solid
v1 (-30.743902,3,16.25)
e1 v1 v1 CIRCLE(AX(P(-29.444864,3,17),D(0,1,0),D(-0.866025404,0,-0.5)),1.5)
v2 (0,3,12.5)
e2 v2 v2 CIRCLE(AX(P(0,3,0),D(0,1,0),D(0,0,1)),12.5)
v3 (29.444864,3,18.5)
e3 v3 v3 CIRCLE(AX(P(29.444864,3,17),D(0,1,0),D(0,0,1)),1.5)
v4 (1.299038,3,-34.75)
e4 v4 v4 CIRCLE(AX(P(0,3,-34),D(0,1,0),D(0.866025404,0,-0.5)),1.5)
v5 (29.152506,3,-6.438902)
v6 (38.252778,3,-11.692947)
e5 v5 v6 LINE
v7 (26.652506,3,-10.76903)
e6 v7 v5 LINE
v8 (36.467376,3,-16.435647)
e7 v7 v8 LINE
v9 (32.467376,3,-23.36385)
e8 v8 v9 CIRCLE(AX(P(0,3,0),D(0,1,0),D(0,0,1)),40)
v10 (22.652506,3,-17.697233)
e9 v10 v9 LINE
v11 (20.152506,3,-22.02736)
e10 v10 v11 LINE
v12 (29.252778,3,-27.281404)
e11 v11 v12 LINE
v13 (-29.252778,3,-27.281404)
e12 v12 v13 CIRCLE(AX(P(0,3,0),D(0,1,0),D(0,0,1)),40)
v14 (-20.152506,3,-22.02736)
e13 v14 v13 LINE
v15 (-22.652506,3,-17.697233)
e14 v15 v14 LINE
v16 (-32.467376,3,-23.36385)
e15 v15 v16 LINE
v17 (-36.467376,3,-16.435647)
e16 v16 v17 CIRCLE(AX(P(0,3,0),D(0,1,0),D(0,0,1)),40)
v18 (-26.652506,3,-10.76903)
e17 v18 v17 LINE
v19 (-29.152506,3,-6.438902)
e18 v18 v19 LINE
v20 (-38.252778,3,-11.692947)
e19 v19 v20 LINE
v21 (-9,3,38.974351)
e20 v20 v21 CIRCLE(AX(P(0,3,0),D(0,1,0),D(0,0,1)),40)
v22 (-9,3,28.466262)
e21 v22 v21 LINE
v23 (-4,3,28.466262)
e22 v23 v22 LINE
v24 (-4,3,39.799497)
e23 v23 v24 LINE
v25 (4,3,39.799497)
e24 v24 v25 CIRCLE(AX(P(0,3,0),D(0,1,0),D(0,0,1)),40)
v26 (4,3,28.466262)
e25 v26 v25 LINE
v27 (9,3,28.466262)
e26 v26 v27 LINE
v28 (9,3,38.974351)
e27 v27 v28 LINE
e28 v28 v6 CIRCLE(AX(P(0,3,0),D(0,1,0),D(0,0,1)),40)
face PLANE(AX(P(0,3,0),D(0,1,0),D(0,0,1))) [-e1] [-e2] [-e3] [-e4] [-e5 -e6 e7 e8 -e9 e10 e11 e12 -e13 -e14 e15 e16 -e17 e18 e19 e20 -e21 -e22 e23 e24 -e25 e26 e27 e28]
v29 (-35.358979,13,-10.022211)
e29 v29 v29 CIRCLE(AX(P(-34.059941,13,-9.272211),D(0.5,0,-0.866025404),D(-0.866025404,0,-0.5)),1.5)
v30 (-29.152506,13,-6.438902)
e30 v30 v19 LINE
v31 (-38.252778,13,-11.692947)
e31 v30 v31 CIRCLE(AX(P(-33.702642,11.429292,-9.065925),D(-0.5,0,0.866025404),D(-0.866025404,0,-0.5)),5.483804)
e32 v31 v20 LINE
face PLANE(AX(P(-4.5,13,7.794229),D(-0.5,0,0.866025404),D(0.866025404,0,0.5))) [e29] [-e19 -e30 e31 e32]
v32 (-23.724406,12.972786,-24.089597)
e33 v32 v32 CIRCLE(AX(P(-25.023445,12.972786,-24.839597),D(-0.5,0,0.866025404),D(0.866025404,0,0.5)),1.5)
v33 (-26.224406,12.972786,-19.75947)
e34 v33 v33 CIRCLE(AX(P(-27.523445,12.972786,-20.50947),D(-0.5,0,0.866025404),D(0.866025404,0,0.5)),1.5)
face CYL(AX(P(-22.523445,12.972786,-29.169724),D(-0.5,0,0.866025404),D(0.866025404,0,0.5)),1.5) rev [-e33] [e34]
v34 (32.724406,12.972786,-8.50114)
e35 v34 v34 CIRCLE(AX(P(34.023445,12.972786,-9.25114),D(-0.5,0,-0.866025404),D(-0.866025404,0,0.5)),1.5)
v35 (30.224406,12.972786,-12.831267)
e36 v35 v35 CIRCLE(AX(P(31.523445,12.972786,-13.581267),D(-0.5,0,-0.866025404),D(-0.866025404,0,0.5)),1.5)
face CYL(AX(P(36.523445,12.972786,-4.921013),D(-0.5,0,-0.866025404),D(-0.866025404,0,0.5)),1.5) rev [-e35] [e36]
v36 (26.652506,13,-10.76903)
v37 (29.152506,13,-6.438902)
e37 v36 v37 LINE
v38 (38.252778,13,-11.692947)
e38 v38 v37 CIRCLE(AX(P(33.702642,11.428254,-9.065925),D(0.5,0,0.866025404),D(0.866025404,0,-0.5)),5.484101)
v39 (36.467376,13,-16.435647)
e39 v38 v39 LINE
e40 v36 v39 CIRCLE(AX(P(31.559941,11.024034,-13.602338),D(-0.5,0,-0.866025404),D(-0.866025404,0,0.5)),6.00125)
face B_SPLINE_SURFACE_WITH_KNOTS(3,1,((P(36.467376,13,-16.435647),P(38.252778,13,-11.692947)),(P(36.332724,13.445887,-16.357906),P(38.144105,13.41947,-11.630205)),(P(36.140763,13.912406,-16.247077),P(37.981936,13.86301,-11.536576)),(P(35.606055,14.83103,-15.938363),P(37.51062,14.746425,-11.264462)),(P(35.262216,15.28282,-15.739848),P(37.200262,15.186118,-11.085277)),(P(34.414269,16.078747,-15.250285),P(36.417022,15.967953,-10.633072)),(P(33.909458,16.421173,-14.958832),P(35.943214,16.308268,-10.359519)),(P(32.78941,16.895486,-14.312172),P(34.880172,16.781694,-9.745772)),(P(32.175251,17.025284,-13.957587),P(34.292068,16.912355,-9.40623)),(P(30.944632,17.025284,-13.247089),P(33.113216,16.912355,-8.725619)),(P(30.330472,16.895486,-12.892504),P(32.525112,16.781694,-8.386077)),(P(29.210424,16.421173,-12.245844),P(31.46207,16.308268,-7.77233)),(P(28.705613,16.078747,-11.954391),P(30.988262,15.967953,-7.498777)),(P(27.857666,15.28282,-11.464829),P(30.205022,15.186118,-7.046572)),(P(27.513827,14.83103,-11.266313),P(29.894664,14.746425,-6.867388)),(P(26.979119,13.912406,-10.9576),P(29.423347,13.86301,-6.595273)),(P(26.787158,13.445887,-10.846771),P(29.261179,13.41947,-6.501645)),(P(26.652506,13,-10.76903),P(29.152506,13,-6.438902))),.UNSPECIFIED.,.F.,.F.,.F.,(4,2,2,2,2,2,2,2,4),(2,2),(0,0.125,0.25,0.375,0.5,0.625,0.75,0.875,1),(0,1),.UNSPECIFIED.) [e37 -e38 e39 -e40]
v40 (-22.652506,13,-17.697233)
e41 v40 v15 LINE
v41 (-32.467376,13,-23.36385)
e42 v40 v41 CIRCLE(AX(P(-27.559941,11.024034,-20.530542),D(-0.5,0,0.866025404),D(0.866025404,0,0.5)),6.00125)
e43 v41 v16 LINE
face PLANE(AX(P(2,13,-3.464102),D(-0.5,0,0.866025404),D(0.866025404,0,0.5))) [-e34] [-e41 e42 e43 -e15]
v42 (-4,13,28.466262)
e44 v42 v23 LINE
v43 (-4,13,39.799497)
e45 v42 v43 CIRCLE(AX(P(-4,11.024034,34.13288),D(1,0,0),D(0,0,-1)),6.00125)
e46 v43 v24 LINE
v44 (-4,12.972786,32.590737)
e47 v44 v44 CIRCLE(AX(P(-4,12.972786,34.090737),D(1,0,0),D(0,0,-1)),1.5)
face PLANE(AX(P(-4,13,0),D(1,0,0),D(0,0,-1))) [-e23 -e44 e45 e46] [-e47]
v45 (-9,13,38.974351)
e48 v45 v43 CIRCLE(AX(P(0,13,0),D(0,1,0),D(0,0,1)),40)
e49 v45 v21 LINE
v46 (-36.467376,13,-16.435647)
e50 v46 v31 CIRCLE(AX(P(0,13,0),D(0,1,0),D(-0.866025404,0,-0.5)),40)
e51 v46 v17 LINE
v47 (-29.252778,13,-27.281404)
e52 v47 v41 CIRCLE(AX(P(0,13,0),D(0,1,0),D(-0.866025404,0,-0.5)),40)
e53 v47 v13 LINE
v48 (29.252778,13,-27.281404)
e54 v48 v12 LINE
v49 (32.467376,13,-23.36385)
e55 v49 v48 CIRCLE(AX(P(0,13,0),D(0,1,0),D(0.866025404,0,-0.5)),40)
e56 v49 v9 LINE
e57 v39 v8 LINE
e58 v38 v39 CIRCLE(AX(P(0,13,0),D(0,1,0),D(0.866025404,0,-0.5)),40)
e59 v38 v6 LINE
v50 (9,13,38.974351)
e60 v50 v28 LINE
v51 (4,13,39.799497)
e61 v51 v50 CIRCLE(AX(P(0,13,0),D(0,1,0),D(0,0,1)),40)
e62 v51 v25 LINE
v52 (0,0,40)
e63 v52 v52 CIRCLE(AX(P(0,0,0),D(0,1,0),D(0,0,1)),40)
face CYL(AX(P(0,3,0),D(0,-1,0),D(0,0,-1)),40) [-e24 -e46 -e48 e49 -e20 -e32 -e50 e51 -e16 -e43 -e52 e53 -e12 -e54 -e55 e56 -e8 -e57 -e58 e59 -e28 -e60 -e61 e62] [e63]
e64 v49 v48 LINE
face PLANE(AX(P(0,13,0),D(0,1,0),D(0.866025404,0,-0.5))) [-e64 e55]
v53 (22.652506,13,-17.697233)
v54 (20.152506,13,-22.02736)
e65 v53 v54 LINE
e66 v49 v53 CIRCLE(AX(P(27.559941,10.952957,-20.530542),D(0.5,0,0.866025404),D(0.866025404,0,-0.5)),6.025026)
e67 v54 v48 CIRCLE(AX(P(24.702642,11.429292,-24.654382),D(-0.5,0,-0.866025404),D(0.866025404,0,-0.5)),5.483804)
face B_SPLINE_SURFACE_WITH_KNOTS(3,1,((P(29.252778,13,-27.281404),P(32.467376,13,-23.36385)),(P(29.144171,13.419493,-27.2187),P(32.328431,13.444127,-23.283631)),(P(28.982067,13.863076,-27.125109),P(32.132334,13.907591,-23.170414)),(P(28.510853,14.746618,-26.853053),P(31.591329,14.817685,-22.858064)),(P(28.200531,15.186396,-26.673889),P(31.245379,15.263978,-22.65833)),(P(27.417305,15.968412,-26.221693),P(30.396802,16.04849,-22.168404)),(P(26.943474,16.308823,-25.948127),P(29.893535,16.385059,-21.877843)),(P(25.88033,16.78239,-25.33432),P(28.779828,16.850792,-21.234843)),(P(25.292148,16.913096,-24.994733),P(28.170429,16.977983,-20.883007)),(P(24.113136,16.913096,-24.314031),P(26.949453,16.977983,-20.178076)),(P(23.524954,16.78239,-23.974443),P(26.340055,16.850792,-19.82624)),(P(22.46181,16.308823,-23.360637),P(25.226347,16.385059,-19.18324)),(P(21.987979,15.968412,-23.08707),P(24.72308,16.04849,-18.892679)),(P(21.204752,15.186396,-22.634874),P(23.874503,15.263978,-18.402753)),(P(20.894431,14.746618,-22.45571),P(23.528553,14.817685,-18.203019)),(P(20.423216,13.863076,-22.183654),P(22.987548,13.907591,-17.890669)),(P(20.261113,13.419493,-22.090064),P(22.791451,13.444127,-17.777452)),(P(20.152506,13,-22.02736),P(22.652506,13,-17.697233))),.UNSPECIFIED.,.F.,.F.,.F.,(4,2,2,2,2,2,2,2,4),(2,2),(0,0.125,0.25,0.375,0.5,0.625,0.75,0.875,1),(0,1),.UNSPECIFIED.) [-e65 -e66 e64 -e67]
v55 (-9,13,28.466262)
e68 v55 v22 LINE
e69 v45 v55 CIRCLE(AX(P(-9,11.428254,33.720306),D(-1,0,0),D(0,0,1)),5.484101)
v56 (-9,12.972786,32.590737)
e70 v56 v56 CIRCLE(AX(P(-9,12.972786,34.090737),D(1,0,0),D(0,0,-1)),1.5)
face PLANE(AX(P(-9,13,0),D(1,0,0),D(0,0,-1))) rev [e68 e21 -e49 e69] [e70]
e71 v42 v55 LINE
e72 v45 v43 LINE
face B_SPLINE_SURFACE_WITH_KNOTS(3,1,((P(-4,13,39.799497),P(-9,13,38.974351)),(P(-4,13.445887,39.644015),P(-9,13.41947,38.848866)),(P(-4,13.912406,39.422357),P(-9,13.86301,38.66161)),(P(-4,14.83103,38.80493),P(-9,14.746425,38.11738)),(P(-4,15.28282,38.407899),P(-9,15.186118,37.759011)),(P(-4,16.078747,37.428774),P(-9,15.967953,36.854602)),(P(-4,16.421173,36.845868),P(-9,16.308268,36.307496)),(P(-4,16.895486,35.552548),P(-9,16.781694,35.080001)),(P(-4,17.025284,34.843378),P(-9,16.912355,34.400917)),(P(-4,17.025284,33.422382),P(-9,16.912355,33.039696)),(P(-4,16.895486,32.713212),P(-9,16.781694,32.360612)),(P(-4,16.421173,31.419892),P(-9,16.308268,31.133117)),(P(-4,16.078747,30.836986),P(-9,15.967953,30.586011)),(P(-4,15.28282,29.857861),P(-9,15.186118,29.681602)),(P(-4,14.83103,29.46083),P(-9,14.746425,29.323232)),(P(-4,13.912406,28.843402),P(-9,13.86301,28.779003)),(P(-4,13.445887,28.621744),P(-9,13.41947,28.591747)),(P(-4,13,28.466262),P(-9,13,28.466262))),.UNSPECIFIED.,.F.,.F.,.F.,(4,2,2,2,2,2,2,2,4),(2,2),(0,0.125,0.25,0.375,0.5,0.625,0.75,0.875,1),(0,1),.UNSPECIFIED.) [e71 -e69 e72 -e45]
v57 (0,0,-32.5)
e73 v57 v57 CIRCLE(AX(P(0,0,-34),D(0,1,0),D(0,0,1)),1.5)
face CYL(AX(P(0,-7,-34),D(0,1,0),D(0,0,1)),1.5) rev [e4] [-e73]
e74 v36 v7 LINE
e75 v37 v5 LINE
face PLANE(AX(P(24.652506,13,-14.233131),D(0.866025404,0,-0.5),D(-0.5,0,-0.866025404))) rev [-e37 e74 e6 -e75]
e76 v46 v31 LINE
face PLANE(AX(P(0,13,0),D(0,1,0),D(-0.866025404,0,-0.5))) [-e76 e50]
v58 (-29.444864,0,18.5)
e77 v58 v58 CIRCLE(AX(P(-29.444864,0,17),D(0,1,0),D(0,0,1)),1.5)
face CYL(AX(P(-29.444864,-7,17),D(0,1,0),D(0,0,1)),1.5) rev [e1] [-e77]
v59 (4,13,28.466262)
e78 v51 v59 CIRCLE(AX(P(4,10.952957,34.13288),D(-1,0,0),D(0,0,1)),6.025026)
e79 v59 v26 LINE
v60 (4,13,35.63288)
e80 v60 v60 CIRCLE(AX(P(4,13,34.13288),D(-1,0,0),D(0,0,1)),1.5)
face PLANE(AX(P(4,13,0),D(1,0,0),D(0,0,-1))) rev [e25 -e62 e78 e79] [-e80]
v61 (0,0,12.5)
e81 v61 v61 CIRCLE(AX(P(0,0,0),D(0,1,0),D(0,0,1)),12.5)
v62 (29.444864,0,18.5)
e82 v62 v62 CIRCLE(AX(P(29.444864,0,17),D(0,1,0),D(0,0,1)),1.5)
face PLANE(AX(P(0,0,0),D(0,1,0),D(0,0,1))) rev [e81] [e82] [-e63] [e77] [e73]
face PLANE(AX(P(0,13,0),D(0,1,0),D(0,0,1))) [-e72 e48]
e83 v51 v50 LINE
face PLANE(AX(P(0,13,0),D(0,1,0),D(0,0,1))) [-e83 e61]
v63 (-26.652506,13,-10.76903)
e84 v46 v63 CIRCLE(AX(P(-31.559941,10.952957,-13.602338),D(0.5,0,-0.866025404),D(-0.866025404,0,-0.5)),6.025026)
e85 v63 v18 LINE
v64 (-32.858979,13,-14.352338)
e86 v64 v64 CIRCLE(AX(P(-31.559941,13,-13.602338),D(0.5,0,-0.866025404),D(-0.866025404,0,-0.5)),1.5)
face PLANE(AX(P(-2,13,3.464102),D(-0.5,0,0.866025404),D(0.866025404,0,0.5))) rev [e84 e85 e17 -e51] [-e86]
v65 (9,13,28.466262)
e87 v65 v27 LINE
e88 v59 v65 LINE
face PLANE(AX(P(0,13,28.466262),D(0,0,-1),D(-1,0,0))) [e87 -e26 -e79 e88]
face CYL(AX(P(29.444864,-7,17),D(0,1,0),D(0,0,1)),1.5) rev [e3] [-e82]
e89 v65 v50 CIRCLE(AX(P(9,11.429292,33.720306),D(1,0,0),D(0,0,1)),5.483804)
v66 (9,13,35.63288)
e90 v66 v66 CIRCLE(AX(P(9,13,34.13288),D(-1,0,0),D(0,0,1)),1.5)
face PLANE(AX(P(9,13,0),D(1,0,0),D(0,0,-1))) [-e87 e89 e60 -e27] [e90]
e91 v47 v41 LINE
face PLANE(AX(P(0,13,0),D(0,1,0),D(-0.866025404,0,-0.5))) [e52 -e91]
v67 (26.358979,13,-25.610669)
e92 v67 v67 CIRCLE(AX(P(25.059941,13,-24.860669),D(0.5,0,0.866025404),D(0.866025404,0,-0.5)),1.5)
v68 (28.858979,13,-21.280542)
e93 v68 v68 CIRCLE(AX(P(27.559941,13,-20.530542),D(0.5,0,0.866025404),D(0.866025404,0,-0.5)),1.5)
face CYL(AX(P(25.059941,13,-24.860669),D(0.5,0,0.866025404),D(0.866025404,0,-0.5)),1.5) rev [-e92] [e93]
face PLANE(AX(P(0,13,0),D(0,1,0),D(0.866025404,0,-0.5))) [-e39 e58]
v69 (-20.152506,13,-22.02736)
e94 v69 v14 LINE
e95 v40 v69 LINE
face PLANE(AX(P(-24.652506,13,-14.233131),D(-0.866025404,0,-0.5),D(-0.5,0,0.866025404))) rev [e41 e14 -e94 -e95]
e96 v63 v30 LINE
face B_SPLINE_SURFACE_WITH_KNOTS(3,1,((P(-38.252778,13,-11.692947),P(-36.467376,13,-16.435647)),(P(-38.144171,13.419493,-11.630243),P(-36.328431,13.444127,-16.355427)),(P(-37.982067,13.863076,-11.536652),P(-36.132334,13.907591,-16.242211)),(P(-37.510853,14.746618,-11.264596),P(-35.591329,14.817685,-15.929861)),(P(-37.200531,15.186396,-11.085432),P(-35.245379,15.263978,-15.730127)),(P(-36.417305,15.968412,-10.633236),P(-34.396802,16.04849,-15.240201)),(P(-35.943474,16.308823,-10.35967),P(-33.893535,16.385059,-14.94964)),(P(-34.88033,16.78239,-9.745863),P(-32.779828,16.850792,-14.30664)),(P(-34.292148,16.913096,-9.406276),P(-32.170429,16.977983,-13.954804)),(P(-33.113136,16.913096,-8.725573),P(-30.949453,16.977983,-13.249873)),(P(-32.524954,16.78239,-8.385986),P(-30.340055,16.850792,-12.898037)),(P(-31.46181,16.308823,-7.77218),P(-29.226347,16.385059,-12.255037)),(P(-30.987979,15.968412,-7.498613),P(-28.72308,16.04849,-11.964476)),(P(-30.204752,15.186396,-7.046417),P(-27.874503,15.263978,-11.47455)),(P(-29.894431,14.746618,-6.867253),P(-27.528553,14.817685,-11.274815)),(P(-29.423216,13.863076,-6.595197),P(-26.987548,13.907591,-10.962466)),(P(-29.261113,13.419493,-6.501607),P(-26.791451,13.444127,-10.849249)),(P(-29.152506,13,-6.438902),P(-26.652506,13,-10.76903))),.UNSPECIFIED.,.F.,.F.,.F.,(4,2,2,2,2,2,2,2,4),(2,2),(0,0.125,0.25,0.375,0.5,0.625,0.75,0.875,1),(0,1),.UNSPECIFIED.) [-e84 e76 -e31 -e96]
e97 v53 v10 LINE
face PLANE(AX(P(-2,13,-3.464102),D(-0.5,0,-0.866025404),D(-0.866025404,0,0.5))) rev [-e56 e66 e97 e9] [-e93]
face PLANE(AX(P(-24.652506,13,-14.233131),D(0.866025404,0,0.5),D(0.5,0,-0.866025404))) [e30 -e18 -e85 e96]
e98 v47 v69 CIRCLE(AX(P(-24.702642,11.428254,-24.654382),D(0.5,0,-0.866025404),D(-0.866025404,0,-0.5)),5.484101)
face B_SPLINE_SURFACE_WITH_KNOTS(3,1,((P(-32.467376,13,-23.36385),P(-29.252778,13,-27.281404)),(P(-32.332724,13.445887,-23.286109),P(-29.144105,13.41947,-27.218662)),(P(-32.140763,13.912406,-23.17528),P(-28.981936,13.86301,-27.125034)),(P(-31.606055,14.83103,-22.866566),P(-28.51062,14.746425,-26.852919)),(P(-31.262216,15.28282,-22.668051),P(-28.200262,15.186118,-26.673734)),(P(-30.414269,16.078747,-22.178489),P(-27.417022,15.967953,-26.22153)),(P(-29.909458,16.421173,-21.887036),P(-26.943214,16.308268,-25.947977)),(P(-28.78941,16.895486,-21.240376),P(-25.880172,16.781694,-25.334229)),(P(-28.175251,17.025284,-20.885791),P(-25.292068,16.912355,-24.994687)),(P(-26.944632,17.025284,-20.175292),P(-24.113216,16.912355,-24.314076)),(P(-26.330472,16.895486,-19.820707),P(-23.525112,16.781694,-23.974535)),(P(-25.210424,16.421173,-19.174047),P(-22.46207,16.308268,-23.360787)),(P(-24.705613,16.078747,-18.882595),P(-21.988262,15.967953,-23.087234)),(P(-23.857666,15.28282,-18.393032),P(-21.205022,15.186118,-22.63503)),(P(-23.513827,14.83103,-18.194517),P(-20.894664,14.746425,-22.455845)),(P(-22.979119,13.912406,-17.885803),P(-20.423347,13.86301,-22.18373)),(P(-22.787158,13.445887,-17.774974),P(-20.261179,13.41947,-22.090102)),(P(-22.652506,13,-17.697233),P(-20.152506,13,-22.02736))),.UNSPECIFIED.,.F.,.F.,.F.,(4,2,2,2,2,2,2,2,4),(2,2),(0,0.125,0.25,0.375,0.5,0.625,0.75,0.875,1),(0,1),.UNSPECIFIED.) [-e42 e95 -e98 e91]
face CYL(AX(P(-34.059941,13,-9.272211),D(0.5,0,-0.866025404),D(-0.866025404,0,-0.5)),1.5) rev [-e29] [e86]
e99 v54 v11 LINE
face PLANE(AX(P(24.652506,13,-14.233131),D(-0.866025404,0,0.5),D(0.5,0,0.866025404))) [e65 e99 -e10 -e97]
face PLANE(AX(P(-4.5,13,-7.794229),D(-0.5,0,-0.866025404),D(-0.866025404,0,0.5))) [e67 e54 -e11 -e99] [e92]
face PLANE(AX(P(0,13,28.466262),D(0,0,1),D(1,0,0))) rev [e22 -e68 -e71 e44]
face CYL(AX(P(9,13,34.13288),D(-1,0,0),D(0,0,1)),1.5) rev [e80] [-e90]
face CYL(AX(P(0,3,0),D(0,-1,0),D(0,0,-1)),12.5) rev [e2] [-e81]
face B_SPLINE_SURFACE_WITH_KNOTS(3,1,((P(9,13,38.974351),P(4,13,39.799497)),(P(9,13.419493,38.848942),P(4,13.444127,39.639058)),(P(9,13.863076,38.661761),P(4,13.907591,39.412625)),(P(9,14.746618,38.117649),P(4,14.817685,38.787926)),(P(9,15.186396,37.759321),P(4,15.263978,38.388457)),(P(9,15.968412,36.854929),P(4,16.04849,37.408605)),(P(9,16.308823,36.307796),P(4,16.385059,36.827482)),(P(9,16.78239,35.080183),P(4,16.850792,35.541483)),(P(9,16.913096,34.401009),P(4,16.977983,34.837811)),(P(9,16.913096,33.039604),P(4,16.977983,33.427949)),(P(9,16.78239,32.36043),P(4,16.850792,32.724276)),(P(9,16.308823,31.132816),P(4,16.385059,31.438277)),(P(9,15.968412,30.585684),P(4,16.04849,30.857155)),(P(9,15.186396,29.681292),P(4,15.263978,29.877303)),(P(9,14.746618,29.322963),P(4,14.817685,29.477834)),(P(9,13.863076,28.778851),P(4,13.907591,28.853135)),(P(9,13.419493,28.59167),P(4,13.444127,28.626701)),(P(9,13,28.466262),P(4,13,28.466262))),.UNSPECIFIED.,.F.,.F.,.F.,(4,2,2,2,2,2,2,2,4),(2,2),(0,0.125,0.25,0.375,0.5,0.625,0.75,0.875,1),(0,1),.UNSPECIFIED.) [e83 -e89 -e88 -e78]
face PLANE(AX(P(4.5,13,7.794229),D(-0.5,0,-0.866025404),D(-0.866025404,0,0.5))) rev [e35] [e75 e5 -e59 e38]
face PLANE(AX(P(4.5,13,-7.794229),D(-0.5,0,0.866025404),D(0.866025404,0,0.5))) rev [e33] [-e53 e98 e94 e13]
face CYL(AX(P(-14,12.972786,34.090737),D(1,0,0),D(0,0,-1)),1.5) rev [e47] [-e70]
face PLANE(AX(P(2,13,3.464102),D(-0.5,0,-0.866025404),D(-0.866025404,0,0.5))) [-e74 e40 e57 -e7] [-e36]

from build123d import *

# Parameters (mm, degrees)
SKETCH1_R           = 40
SKETCH1_R_2         = 12.5
BOSS_EXTRUDE1_DEPTH = 3
BOSS_EXTRUDE5_DEPTH = 10
SKETCH20_R          = 1.5
CUT_EXTRUDE3_DEPTH  = 5
SKETCH22_R          = 1.5
CUT_EXTRUDE4_DEPTH  = 10
CIRPATTERN1_COUNT   = 3
SKETCH24_R          = 1.5
CUT_EXTRUDE5_DEPTH  = 10
CIRPATTERN2_COUNT   = 3


with BuildPart() as part:
    # Sketch1 → Boss-Extrude1 (new body)
    with BuildSketch(Plane(origin=(0, 0, 0), x_dir=(1, 0, 0), z_dir=(0, 1, 0))):
        with Locations(Location((0, 0, 0), (0, 0, 270))):
            Circle(SKETCH1_R)
        with Locations(Location((0, 0, 0), (0, 0, 270))):
            Circle(SKETCH1_R_2, mode=Mode.SUBTRACT)
    extrude(amount=BOSS_EXTRUDE1_DEPTH)

    # Sketch8 → Boss-Extrude5 (add)
    with BuildSketch(Plane(origin=(0, 3, 0), x_dir=(1, 0, 0), z_dir=(0, 1, 0))):
        with BuildLine():
            Line((-4, -39.799497484), (-4, -28.466262232))
            Line((-4, -28.466262232), (-9, -28.466262232))
            Line((-9, -28.466262232), (-9, -38.97435054))
            ThreePointArc((-9, -38.97435054), (-6.513080444, -39.466185313), (-4, -39.799497484))
        make_face()
        with BuildLine():
            Line((4, -28.466262232), (4, -39.799497484))
            ThreePointArc((4, -39.799497484), (6.513080444, -39.466185313), (9, -38.97435054))
            Line((9, -38.97435054), (9, -28.466262232))
            Line((9, -28.466262232), (4, -28.466262232))
        make_face()
    boss_extrude5 = extrude(amount=BOSS_EXTRUDE5_DEPTH)

    # Sketch9 for Loft4 → Loft4 section 0
    with BuildSketch(Plane(origin=(9, 0, 0), x_dir=(0, 0, -1), z_dir=(1, 0, 0))):
        with BuildLine():
            Line((-28.466262232, 13), (-38.97435054, 13))
            # circular arc as an exact rational Bezier (weights 1, cos(half-angle), 1)
            Bezier((-38.97435054, 13), (-33.720306386, 30.574863042), (-28.466262232, 13), weights=[1, 0.286426753, 1])
        make_face()
    # Sketch10 for Loft4 → Loft4 section 1
    with BuildSketch(Plane.ZY.offset(-4)):
        with BuildLine():
            Line((28.466262232, 13), (39.799497484, 13))
            Bezier((39.799497484, 13), (34.132879858, 28.686313092), (28.466262232, 13), weights=[1, 0.339756679, 1])
        make_face()
    loft4 = loft()

    # Loft7: read off the stored shape, not the designer's step
    # Loft7: loft between two sections, ruled curve by curve
    loft7_from = [
        Edge.make_bspline([(-4, 13, 39.799497484), (-4, 13.445887075, 39.644015382), (-4, 13.912406496, 39.42235746), (-4, 14.83103025, 38.804929607), (-4, 15.282819738, 38.407898984), (-4, 16.078747391, 37.428773866), (-4, 16.421172618, 36.845868146), (-4, 16.895486355, 35.552548175), (-4, 17.025283738, 34.843378132), (-4, 17.025283738, 33.422381584), (-4, 16.895486355, 32.713211541), (-4, 16.421172618, 31.419891571), (-4, 16.078747391, 30.83698585), (-4, 15.282819738, 29.857860733), (-4, 14.83103025, 29.460830109), (-4, 13.912406496, 28.843402256), (-4, 13.445887075, 28.621744334), (-4, 13, 28.466262232)], [0, 0, 0, 0, 0.125, 0.125, 0.25, 0.25, 0.375, 0.375, 0.5, 0.5, 0.625, 0.625, 0.75, 0.75, 0.875, 0.875, 1, 1, 1, 1], 3),
        Edge.make_line((-4, 13, 28.466262232), (-4, 13, 39.799497484)),
    ]
    loft7_to = [
        Edge.make_bspline([(-9, 13, 38.97435054), (-9, 13.419469841, 38.848866269), (-9, 13.863009903, 38.66161005), (-9, 14.746425178, 38.117380283), (-9, 15.186117881, 37.75901052), (-9, 15.967952584, 36.854602056), (-9, 16.308267994, 36.307496065), (-9, 16.781693902, 35.08000068), (-9, 16.912355403, 34.400917098), (-9, 16.912355403, 33.039695674), (-9, 16.781693902, 32.360612092), (-9, 16.308267994, 31.133116706), (-9, 15.967952584, 30.586010716), (-9, 15.186117881, 29.681602252), (-9, 14.746425178, 29.323232488), (-9, 13.863009903, 28.779002722), (-9, 13.419469841, 28.591746503), (-9, 13, 28.466262232)], [0, 0, 0, 0, 0.125, 0.125, 0.25, 0.25, 0.375, 0.375, 0.5, 0.5, 0.625, 0.625, 0.75, 0.75, 0.875, 0.875, 1, 1, 1, 1], 3),
        Edge.make_line((-9, 13, 28.466262232), (-9, 13, 38.97435054)),
    ]
    loft7 = Solid(Shell([*[Face.make_surface_from_curves(loft7_from[k], loft7_to[k]) for k in range(2)], Face(Wire(loft7_from)), Face(Wire(loft7_to))]))
    add(loft7)

    # Sketch20 → Cut-Extrude3 (cut)
    with BuildSketch(Plane.ZY.offset(-4)):
        with Locations((34.132879858, 13)):
            Circle(SKETCH20_R)
    cut_extrude3 = extrude(amount=-CUT_EXTRUDE3_DEPTH, mode=Mode.SUBTRACT)

    # Sketch22 → Cut-Extrude4 (cut)
    with BuildSketch(Plane(origin=(-4, 0, 0), x_dir=(0, 0, -1), z_dir=(1, 0, 0))):
        with Locations((-34.090737301, 12.972785767)):
            Circle(SKETCH22_R)
    cut_extrude4 = extrude(amount=-CUT_EXTRUDE4_DEPTH, mode=Mode.SUBTRACT)

    # CirPattern1: Boss-Extrude5, Loft4, Loft7, Cut-Extrude3, Cut-Extrude4 ×3 about axis
    cirpattern1_axis = Axis((0, 0, 0), (0, 1, 0))
    add([boss_extrude5.rotate(cirpattern1_axis, i * 360 / CIRPATTERN1_COUNT) for i in range(1, CIRPATTERN1_COUNT)])
    add([loft4.rotate(cirpattern1_axis, i * 360 / CIRPATTERN1_COUNT) for i in range(1, CIRPATTERN1_COUNT)])
    add([loft7.rotate(cirpattern1_axis, i * 360 / CIRPATTERN1_COUNT) for i in range(1, CIRPATTERN1_COUNT)])
    add([cut_extrude3.rotate(cirpattern1_axis, i * 360 / CIRPATTERN1_COUNT) for i in range(1, CIRPATTERN1_COUNT)], mode=Mode.SUBTRACT)
    add([cut_extrude4.rotate(cirpattern1_axis, i * 360 / CIRPATTERN1_COUNT) for i in range(1, CIRPATTERN1_COUNT)], mode=Mode.SUBTRACT)

    # Sketch24 → Cut-Extrude5 (cut)
    with BuildSketch(Plane(origin=(0, 3, 0), x_dir=(1, 0, 0), z_dir=(0, 1, 0))):
        with Locations(Location((29.444863729, -17, 0), (0, 0, 270))):
            Circle(SKETCH24_R)
    cut_extrude5 = extrude(amount=-CUT_EXTRUDE5_DEPTH, mode=Mode.SUBTRACT)

    # CirPattern2: Cut-Extrude5 ×3 about axis
    cirpattern2_axis = Axis((0, 0, 0), (0, 1, 0))
    for i in range(1, CIRPATTERN2_COUNT):
        add(cut_extrude5.rotate(cirpattern2_axis, i * 360 / CIRPATTERN2_COUNT), mode=Mode.SUBTRACT)


solid = part.part
